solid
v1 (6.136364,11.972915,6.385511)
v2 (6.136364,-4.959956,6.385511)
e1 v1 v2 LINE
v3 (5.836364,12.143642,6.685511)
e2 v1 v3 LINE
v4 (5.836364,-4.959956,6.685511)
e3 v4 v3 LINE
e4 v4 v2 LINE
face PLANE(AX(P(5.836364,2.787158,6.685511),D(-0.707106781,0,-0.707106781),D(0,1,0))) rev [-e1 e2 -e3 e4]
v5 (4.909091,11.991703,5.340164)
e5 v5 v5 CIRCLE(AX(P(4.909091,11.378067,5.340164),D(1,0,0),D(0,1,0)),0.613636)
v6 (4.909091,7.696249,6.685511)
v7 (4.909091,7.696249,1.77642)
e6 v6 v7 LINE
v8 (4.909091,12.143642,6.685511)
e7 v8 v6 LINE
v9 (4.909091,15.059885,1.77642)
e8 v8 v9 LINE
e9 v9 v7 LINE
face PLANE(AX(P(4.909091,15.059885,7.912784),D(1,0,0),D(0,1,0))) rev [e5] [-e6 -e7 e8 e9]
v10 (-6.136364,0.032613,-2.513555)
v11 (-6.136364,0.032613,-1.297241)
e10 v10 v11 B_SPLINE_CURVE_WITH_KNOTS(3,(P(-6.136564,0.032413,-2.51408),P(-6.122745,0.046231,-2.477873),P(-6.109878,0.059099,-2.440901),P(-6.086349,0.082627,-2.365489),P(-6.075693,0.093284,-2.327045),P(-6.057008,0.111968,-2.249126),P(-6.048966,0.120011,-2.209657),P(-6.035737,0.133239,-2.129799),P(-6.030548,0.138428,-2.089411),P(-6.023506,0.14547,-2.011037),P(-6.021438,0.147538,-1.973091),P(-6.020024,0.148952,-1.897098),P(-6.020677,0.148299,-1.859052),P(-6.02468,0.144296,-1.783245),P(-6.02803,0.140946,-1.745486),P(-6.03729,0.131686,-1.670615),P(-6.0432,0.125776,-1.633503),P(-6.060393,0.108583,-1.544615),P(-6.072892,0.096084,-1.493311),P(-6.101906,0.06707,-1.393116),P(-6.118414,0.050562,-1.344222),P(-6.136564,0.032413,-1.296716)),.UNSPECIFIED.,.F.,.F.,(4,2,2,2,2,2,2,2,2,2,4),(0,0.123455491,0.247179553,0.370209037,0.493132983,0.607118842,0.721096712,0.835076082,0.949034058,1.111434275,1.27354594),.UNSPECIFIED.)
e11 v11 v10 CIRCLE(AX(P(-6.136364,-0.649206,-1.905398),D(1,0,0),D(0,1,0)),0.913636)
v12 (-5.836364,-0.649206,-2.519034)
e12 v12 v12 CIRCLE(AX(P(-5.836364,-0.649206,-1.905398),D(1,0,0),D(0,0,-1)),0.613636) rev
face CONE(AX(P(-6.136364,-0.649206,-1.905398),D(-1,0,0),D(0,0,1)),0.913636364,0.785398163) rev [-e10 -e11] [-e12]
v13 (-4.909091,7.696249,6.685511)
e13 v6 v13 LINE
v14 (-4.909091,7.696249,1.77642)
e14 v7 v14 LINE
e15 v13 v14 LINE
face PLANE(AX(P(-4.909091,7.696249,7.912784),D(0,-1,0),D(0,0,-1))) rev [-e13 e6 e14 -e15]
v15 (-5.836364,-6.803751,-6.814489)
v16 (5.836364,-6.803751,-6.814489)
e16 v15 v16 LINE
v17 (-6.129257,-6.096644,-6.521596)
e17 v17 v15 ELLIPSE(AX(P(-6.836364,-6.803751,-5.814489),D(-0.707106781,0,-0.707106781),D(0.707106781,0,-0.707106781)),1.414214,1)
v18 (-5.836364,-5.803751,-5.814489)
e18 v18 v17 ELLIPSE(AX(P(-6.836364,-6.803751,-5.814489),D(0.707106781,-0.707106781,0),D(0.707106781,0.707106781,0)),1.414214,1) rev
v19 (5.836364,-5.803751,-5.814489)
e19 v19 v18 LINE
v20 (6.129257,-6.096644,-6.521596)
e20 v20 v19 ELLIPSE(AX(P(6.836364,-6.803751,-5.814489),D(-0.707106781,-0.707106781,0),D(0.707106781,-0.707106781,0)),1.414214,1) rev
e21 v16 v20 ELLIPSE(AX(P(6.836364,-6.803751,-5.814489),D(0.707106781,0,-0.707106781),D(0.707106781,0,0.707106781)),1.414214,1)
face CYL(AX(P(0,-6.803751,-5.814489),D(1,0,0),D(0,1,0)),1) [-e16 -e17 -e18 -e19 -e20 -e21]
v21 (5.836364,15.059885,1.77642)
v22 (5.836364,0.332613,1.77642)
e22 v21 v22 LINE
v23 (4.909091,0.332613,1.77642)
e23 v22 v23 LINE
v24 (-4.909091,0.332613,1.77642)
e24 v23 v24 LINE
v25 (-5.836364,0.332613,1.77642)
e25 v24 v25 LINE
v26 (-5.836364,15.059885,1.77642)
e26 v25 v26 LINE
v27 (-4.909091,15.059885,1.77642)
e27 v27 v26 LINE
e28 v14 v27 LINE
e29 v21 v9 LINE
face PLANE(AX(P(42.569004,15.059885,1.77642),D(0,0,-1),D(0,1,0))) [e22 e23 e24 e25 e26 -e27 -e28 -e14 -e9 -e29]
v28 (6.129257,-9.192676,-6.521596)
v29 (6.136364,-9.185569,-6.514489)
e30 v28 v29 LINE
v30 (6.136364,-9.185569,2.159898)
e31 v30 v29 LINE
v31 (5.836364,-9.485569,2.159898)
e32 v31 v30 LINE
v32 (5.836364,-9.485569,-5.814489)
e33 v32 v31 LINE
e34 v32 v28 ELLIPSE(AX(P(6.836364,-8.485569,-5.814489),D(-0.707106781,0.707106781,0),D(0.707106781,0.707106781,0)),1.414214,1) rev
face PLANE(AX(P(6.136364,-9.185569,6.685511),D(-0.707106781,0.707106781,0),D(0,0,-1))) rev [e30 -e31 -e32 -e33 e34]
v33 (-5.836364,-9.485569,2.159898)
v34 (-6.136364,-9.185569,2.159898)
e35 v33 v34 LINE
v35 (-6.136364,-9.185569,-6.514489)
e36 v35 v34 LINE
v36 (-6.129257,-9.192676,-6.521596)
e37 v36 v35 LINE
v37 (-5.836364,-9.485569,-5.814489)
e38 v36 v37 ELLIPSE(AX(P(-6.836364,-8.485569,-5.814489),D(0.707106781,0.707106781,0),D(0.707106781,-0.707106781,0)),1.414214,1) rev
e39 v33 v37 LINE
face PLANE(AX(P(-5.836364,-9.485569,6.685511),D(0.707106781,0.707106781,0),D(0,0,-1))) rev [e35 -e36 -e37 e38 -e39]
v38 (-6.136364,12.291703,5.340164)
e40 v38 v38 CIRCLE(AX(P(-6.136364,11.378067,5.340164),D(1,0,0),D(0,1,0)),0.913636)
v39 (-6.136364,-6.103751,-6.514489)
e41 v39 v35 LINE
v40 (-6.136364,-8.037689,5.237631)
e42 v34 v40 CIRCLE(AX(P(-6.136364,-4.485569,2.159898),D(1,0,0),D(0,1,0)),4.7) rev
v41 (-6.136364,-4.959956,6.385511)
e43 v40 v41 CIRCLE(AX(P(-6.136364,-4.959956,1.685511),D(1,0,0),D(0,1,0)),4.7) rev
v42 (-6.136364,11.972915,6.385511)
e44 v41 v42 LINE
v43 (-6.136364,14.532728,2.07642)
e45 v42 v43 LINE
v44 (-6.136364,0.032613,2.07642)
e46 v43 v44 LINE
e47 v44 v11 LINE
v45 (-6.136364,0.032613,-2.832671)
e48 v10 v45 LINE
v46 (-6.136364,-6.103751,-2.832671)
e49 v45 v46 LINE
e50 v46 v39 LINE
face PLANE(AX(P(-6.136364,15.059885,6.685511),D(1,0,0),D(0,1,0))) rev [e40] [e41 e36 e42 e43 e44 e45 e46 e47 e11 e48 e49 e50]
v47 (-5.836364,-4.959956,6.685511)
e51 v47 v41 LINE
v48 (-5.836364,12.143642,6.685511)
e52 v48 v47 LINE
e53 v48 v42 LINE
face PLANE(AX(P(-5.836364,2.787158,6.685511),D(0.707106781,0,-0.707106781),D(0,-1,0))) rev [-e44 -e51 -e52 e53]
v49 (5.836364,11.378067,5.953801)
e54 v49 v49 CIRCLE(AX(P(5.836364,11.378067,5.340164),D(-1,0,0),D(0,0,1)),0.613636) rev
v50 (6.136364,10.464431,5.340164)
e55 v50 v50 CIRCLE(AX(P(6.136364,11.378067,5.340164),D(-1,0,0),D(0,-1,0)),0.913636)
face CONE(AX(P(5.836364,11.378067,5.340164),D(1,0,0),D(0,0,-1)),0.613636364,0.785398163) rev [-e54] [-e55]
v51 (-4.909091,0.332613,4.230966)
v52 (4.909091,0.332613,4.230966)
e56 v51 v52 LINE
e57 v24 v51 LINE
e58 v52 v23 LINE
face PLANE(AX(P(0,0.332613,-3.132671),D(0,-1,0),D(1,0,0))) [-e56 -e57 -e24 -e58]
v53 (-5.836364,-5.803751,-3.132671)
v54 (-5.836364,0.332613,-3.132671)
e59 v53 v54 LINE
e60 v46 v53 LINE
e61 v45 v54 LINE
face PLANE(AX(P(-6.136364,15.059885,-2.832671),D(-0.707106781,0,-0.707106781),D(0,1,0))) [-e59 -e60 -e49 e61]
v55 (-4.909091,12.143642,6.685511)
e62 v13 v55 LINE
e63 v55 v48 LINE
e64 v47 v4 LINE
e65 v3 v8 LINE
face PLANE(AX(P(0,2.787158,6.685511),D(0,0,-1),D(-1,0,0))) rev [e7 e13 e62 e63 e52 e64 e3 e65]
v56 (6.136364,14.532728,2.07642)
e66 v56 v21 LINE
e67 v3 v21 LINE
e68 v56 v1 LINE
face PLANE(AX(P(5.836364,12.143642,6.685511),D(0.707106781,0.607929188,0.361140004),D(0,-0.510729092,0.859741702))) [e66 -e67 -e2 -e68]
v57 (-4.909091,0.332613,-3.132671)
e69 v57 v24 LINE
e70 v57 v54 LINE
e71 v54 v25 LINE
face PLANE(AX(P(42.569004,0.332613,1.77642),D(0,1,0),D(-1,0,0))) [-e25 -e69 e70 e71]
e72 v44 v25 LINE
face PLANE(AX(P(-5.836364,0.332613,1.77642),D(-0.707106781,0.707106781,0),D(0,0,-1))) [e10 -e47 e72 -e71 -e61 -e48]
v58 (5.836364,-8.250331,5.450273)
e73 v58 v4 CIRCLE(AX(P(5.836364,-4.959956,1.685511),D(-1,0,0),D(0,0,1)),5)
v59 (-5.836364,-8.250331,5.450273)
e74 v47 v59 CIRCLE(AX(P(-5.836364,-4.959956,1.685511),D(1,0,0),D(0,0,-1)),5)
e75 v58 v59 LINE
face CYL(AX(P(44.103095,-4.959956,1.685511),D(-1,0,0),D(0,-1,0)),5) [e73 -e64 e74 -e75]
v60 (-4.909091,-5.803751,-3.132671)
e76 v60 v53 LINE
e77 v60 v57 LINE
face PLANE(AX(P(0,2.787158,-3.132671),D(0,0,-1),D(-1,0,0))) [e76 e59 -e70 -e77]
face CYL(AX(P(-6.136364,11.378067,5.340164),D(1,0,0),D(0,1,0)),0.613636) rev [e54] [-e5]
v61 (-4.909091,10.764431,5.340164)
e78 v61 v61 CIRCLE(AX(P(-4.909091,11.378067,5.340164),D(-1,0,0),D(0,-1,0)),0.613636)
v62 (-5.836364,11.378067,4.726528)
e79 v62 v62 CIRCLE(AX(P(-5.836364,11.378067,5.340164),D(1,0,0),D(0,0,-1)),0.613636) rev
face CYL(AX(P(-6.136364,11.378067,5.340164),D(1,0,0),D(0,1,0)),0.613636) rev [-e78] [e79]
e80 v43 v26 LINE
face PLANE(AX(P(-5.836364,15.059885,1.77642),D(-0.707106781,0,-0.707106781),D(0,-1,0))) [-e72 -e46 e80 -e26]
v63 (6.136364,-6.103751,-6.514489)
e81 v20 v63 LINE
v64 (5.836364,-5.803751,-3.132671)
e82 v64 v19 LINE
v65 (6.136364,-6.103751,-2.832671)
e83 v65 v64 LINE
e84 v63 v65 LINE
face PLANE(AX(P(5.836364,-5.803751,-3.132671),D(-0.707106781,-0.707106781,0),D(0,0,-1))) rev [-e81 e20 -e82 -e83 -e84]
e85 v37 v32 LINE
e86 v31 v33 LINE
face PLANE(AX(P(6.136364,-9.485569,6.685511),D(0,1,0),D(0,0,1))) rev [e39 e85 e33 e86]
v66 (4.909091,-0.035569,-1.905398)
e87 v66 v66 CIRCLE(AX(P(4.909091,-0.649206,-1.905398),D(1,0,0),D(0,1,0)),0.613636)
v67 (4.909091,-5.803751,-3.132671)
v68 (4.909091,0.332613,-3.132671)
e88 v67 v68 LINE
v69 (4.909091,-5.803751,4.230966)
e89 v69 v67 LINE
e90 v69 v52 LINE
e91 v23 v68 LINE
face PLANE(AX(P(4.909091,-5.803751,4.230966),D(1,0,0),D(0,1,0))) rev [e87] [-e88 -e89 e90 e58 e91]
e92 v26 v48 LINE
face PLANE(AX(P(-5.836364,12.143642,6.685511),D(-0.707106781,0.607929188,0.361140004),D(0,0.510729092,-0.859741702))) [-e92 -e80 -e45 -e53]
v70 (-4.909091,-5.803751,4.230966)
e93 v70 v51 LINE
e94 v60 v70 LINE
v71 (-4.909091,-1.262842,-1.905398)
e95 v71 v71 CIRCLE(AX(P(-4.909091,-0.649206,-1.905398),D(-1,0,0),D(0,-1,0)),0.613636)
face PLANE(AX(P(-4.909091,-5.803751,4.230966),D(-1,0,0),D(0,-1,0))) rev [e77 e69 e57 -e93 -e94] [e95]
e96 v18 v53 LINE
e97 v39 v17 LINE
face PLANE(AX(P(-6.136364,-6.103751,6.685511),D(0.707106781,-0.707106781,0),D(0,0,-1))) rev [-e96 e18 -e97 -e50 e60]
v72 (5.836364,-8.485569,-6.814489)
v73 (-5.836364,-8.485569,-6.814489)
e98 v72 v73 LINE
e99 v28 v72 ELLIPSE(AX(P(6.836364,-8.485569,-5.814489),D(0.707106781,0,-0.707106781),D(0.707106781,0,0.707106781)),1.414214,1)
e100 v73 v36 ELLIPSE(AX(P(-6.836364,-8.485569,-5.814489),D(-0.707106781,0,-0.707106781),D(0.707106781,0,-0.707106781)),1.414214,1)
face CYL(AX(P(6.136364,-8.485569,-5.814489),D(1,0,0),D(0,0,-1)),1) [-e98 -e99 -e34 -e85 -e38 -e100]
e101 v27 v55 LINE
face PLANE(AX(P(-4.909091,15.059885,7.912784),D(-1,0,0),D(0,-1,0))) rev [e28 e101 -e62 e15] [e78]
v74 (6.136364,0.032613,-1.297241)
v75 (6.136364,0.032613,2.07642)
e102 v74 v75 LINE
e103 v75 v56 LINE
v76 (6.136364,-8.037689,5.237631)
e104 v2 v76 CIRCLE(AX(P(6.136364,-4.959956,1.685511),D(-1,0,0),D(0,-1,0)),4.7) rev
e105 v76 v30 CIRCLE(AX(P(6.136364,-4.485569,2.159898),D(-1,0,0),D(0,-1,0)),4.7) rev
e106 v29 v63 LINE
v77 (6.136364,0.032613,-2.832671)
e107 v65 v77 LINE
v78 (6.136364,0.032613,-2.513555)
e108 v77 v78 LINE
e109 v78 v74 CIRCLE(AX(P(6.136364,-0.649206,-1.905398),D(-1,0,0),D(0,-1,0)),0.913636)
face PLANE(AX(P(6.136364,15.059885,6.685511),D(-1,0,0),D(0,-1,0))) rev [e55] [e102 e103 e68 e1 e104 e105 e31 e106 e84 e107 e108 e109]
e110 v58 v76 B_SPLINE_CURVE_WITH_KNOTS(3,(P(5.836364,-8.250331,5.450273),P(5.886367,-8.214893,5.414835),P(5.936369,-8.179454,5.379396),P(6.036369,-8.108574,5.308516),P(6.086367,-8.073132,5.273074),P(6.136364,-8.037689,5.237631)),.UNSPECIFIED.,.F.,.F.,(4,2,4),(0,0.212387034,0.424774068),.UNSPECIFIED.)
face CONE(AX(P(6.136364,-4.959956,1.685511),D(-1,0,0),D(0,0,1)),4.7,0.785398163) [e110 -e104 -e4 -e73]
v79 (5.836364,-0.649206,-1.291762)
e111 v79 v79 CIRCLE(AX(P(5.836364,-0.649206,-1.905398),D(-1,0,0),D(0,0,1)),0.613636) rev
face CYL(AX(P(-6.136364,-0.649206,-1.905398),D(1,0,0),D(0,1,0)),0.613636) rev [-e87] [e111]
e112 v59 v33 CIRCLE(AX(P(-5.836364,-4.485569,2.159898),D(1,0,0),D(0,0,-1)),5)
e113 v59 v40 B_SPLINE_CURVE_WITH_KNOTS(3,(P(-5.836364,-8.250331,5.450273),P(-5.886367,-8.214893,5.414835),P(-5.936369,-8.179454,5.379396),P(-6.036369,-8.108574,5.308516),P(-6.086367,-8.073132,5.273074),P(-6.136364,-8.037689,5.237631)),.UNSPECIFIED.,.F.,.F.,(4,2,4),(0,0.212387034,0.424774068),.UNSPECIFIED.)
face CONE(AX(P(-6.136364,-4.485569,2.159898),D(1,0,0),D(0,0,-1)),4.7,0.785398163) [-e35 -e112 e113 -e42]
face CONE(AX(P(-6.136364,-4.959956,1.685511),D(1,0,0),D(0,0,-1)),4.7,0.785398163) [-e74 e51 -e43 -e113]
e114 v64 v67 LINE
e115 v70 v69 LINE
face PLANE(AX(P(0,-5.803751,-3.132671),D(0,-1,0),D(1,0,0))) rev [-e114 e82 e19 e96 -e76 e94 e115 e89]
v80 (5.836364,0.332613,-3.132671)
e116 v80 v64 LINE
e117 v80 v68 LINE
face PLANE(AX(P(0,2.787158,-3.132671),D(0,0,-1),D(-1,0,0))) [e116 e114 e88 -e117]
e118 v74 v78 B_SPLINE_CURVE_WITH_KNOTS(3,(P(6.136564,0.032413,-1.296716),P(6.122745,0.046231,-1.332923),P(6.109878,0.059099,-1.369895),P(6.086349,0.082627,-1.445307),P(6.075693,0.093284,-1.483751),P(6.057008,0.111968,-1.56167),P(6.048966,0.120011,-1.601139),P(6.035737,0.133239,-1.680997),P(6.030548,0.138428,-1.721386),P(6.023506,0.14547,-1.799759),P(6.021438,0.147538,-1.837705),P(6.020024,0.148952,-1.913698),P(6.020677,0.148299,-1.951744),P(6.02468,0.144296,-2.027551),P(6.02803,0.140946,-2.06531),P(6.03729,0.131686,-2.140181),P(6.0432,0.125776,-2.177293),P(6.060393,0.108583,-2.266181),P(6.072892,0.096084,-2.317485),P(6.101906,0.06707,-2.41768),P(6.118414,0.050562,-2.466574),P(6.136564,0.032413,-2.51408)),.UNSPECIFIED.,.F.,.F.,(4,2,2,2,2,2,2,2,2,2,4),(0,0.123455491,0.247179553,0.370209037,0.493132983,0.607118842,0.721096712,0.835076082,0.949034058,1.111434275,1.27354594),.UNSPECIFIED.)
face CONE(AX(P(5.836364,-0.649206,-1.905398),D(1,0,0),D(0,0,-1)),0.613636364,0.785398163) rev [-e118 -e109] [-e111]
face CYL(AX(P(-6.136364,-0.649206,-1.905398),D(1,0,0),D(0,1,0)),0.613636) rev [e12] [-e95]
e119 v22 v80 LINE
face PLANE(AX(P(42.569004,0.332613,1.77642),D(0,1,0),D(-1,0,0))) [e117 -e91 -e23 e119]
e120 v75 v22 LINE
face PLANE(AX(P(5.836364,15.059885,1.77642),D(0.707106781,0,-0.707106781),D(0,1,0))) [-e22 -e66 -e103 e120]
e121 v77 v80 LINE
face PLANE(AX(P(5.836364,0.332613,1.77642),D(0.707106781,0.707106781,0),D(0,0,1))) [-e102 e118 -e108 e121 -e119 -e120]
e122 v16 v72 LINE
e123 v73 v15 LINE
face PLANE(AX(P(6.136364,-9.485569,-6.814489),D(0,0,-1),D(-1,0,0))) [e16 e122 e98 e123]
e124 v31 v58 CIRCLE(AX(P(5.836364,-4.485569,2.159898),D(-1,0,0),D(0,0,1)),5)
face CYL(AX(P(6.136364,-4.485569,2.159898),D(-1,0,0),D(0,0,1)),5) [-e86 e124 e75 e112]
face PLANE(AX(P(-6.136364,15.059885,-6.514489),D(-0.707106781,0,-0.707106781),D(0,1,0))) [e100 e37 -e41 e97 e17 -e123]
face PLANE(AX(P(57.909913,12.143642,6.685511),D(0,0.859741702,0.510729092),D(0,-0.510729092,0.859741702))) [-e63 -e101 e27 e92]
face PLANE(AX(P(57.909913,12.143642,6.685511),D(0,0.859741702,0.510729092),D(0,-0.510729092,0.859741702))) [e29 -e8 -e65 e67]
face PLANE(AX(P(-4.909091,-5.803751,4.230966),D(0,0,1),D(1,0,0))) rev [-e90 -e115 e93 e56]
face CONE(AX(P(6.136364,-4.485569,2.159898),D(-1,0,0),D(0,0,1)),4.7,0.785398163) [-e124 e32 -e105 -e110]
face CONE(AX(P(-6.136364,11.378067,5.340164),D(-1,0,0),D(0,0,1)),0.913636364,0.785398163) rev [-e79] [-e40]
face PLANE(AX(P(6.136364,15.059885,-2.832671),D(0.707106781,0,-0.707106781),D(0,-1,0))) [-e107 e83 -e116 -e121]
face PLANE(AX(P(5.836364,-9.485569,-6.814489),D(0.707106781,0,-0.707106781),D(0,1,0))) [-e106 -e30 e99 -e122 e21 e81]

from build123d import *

# Parameters (mm, degrees)
SKETCH_1_W                = 5
SKETCH_1_H                = 10
EXTRUDE_1_DEPTH           = 4
CUT_EXTRUDE_1_DEPTH       = 9.124038405
CUT_EXTRUDE_1_DEPTH_BACK  = 9.124038405
CUT_EXTRUDE_2_DEPTH       = 9.124038405
CUT_EXTRUDE_2_DEPTH_BACK  = 9.124038405
SKETCH_6_W                = 4
SKETCH_6_H                = 3
CUT_EXTRUDE_3_DEPTH       = 2.5
SKETCH_7_W                = 4
SKETCH_7_H                = 3
CUT_EXTRUDE_4_DEPTH       = 2.5
CUT_EXTRUDE_5_DEPTH       = 9.124038405
CUT_EXTRUDE_5_DEPTH_BACK  = 9.124038405
CUT_EXTRUDE_10_DEPTH      = 9.124038405
CUT_EXTRUDE_10_DEPTH_BACK = 5
SKETCH_11_R               = 0.25
CUT_EXTRUDE_11_DEPTH      = 5
SKETCH_12_R               = 0.25
CUT_EXTRUDE_12_DEPTH      = 5
EXTRUDE_3_DEPTH           = 5
SCALE_1_SCALE             = 2.454545455
FILLET_1_R                = 5
CHAMFER_1_SIZE            = 0.3
FILLET_2_R                = 1


with BuildPart() as part:
    # 草图1 → 凸台-拉伸1 (new body)
    with BuildSketch(Plane.XY):
        Rectangle(SKETCH_1_W, SKETCH_1_H)
    extrude(amount=EXTRUDE_1_DEPTH)

    # 草图2 → 切除-拉伸1 (cut, two sides: drawn at the far end of the back side and taken through both)
    with BuildSketch(Plane(origin=(2.5, 0, 0), x_dir=(0, 0, -1), z_dir=(1, 0, 0)).offset(-CUT_EXTRUDE_1_DEPTH_BACK)):
        Polygon((-30.132775887, -11.712260262), (-4, 3.811901084), (-2, 5), (24.132775887, 20.524161347), (-6.915546806, 72.789713121), (-61.181098581, 40.553291512), align=None)
    extrude(amount=CUT_EXTRUDE_1_DEPTH + CUT_EXTRUDE_1_DEPTH_BACK, mode=Mode.SUBTRACT)

    # 草图3 → 切除-拉伸2 (cut, two sides: drawn at the far end of the back side and taken through both)
    with BuildSketch(Plane(origin=(2.5, 0, 0), x_dir=(0, 0, -1), z_dir=(1, 0, 0)).offset(-CUT_EXTRUDE_2_DEPTH_BACK)):
        Polygon((-2, 35.396078054), (-2, 5), (-2, -1), (0, -1), (30.396078054, -1), (75.805427436, 39.418773275), (43.409349382, 75.814851329), align=None)
    extrude(amount=CUT_EXTRUDE_2_DEPTH + CUT_EXTRUDE_2_DEPTH_BACK, mode=Mode.SUBTRACT)

    # 草图6 → 切除-拉伸3 (cut)
    with BuildSketch(Plane(origin=(0, -1, 0), x_dir=(1, 0, 0), z_dir=(0, 1, 0))):
        with Locations((0, -1.5)):
            Rectangle(SKETCH_6_W, SKETCH_6_H)
    extrude(amount=-CUT_EXTRUDE_3_DEPTH, mode=Mode.SUBTRACT)

    # 草图7 → 切除-拉伸4 (cut)
    with BuildSketch(Plane(origin=(0, 0, 2), x_dir=(-1, 0, 0), z_dir=(0, 0, -1))):
        with Locations((0, 3.5)):
            Rectangle(SKETCH_7_W, SKETCH_7_H)
    extrude(amount=-CUT_EXTRUDE_4_DEPTH, mode=Mode.SUBTRACT)

    # 草图8 → 切除-拉伸5 (cut, two sides: drawn at the far end of the back side and taken through both)
    with BuildSketch(Plane(origin=(2.5, 0, 0), x_dir=(0, 0, -1), z_dir=(1, 0, 0)).offset(-CUT_EXTRUDE_5_DEPTH_BACK)):
        Polygon((-25.835890872, 17.835890872), (-4, -4), (-3, -5), (18.835890872, -26.835890872), (-24.835890872, -70.507672616), (-69.507672616, -25.835890872), align=None)
    extrude(amount=CUT_EXTRUDE_5_DEPTH + CUT_EXTRUDE_5_DEPTH_BACK, mode=Mode.SUBTRACT)

    # 草图9 → 切除-拉伸10 (cut, two sides: drawn at the far end of the back side and taken through both)
    with BuildSketch(Plane(origin=(2.5, 0, 0), x_dir=(0, 0, -1), z_dir=(1, 0, 0)).offset(-CUT_EXTRUDE_10_DEPTH_BACK)):
        Polygon((-23.148447549, -26.648447549), (-1.5, -5), (0, -3.5), (21.648447549, 18.148447549), (64.945342647, -25.148447549), (20.148447549, -69.945342647), align=None)
    extrude(amount=CUT_EXTRUDE_10_DEPTH + CUT_EXTRUDE_10_DEPTH_BACK, mode=Mode.SUBTRACT)

    # 草图11 → 切除-拉伸11 (cut)
    with BuildSketch(Plane(origin=(2.5, 0, 0), x_dir=(0, 0, -1), z_dir=(1, 0, 0))):
        with Locations(Location((-3.451895846, 3.5, 0), (0, 0, 90))):
            Circle(SKETCH_11_R)
    extrude(amount=-CUT_EXTRUDE_11_DEPTH, mode=Mode.SUBTRACT)

    # 草图12 → 切除-拉伸12 (cut)
    with BuildSketch(Plane(origin=(2.5, 0, 0), x_dir=(0, 0, -1), z_dir=(1, 0, 0))):
        with Locations(Location((-0.5, -1.4, 0), (0, 0, 90))):
            Circle(SKETCH_12_R)
    extrude(amount=-CUT_EXTRUDE_12_DEPTH, mode=Mode.SUBTRACT)

    # 草图14 → 凸台-拉伸3 (add)
    with BuildSketch(Plane.ZY.offset(2.5)):
        Polygon((1.5, -5), (-1.5, -5), (-1.5, -3.5), (0, -3.5), align=None)
    extrude(amount=-EXTRUDE_3_DEPTH)


with BuildPart() as part_1:
    # 缩放比例1: scaled about (0, -1.916171136, 2.153711166)
    add(part.part.scale(SCALE_1_SCALE).moved(Location((0, 2.787158016, -3.132670787))))

    # 圆角1
    # the kernel refuses this fillet: 5 mm, written as the material it takes off along each edge
    with BuildSketch(Plane(origin=(11.314033166, -9.485569257, 4.230965577), x_dir=(0, 0.7071067811865475, 0.7071067811865475), z_dir=(-1, 0, 0))) as fillet_1_piece_1:
        with BuildLine():
            CenterArc((FILLET_1_R * 0.414213562373, FILLET_1_R), FILLET_1_R, 225, 45)
            Line((-FILLET_1_R * 0.292893218813, FILLET_1_R * 0.292893218813), (0, 0))
            Line((0, 0), (FILLET_1_R * 0.414213562373, 0))
        make_face()
    extrude(amount=22.628066332, mode=Mode.SUBTRACT)
    with BuildSketch(Plane(origin=(11.314033166, -7.031023802, 6.685511031), x_dir=(0, -0.7071067811865476, -0.7071067811865476), z_dir=(-1, 0, 0))) as fillet_1_piece_2:
        with BuildLine():
            CenterArc((FILLET_1_R * 0.414213562373, -FILLET_1_R), FILLET_1_R, 90, 45)
            Line((-FILLET_1_R * 0.292893218813, -FILLET_1_R * 0.292893218813), (0, 0))
            Line((0, 0), (FILLET_1_R * 0.414213562373, 0))
        make_face()
    extrude(amount=22.628066332, mode=Mode.SUBTRACT)

    # 倒角1
    # the kernel refuses this chamfer: 0.3 mm, written as the material it takes off along each edge
    with BuildSketch(Plane(origin=(6.136363636, -4.95995599, 6.685511031), x_dir=(-0.9996219169112968, 0, 0.027495876610587344), z_dir=(0, 1, 0)), Plane(origin=(-6.136363636, 12.915147392, 6.685511031), x_dir=(0.9996219169112968, 0, 0.027495876610587344), z_dir=(0, -1, 0))) as chamfer_1_piece_1:
        Polygon((CHAMFER_1_SIZE * 0.999621916911, -CHAMFER_1_SIZE * 0.0274958766106), (-CHAMFER_1_SIZE * 0.0274958766106, -CHAMFER_1_SIZE * 0.999621916911), (0, 0), align=None)
    extrude(amount=17.875103383, mode=Mode.SUBTRACT)
    with BuildSketch(Plane(origin=(6.136363636, 15.831390185, 1.776420122), x_dir=(-0.9996219169112968, 0, -0.027495876610586622), z_dir=(0, -1, 0)), Plane(origin=(-6.136363636, 0.332612561, 1.776420122), x_dir=(0.9996219169112965, 0, -0.027495876610589495), z_dir=(0, 1, 0))) as chamfer_1_piece_2:
        Polygon((CHAMFER_1_SIZE * 0.999621916911, -CHAMFER_1_SIZE * 0.0274958766106), (-CHAMFER_1_SIZE * 0.0274958766106, -CHAMFER_1_SIZE * 0.999621916911), (0, 0), align=None)
    extrude(amount=15.498777624, mode=Mode.SUBTRACT)
    with BuildSketch(Plane(origin=(6.136363636, 0.332612561, 1.776420122), x_dir=(0.02749587661059016, -0.9996219169112965, 0), z_dir=(0, 0, -1)), Plane(origin=(-6.136363636, 0.332612561, -3.904175683), x_dir=(-0.027495876610587448, -0.9996219169112968, 0), z_dir=(0, 0, 1))) as chamfer_1_piece_3:
        Polygon((CHAMFER_1_SIZE * 0.999621916911, CHAMFER_1_SIZE * 0.0274958766106), (-CHAMFER_1_SIZE * 0.0274958766106, CHAMFER_1_SIZE * 0.999621916911), (0, 0), align=None)
    extrude(amount=5.680595805, mode=Mode.SUBTRACT)
    with BuildSketch(Plane(origin=(6.136363636, -5.803751075, -3.132670787), x_dir=(0.027495876610587378, 0, 0.9996219169112965), z_dir=(0, 1, 0)), Plane(origin=(-6.136363636, 1.104117458, -3.132670787), x_dir=(-0.027495876610587378, 0, 0.9996219169112965), z_dir=(0, -1, 0))) as chamfer_1_piece_4:
        Polygon((CHAMFER_1_SIZE * 0.999621916911, -CHAMFER_1_SIZE * 0.0274958766106), (-CHAMFER_1_SIZE * 0.0274958766106, -CHAMFER_1_SIZE * 0.999621916911), (0, 0), align=None)
    extrude(amount=6.907868533, mode=Mode.SUBTRACT)
    with BuildSketch(Plane(origin=(-6.136363636, -5.803751075, -7.585993865), x_dir=(-0.027495876610587264, -0.9996219169112968, 0), z_dir=(0, 0, 1))) as chamfer_1_piece_5:
        Polygon((CHAMFER_1_SIZE * 0.999621916911, CHAMFER_1_SIZE * 0.0274958766106), (-CHAMFER_1_SIZE * 0.0274958766106, CHAMFER_1_SIZE * 0.999621916911), (0, 0), align=None)
    extrude(amount=4.453323078, mode=Mode.SUBTRACT)
    with BuildSketch(Plane(origin=(6.136363636, -5.803751075, -7.585993865), x_dir=(0.027495876610587264, -0.9996219169112968, 0), z_dir=(0, 0, 1))) as chamfer_1_piece_6:
        Polygon((CHAMFER_1_SIZE * 0.999621916911, -CHAMFER_1_SIZE * 0.0274958766106), (-CHAMFER_1_SIZE * 0.0274958766106, -CHAMFER_1_SIZE * 0.999621916911), (0, 0), align=None)
    extrude(amount=4.453323078, mode=Mode.SUBTRACT)
    with BuildSketch(Plane(origin=(-6.136363636, -10.257074153, -6.814488969), x_dir=(-0.027495876610587344, 0, 0.9996219169112968), z_dir=(0, 1, 0))) as chamfer_1_piece_7:
        Polygon((CHAMFER_1_SIZE * 0.999621916911, CHAMFER_1_SIZE * 0.0274958766106), (-CHAMFER_1_SIZE * 0.0274958766106, CHAMFER_1_SIZE * 0.999621916911), (0, 0), align=None)
    extrude(amount=5.224827975, mode=Mode.SUBTRACT)
    with BuildSketch(Plane(origin=(6.136363636, -10.257074153, -6.814488969), x_dir=(0.027495876610587344, 0, 0.9996219169112968), z_dir=(0, 1, 0))) as chamfer_1_piece_8:
        Polygon((CHAMFER_1_SIZE * 0.999621916911, -CHAMFER_1_SIZE * 0.0274958766106), (-CHAMFER_1_SIZE * 0.0274958766106, -CHAMFER_1_SIZE * 0.999621916911), (0, 0), align=None)
    extrude(amount=5.224827975, mode=Mode.SUBTRACT)
    with BuildSketch(Plane(origin=(6.136363636, -9.485569257, 2.159897765), x_dir=(0.027495876610587344, 0.9996219169112968, 0), z_dir=(0, 0, -1)), Plane(origin=(-6.136363636, -9.485569257, -7.585993865), x_dir=(-0.027495876610587344, 0.9996219169112968, 0), z_dir=(0, 0, 1))) as chamfer_1_piece_9:
        Polygon((CHAMFER_1_SIZE * 0.999621916911, -CHAMFER_1_SIZE * 0.0274958766106), (-CHAMFER_1_SIZE * 0.0274958766106, -CHAMFER_1_SIZE * 0.999621916911), (0, 0), align=None)
    extrude(amount=9.74589163, mode=Mode.SUBTRACT)
    with BuildSketch(Plane(origin=(6.136363636, -4.485569257, 2.159897765), x_dir=(0, -0.642857600187849, 0.765985708666108), z_dir=(0, 0.765985708666108, 0.642857600187849))) as chamfer_1_piece_10:
        Polygon((5 - CHAMFER_1_SIZE, 0), (5, -CHAMFER_1_SIZE), (5, 0), align=None)
    revolve(axis=Axis((6.136363636, -4.485569257, 2.159897765), (1, 0, 0)), revolution_arc=49.994764907, mode=Mode.SUBTRACT)
    with BuildSketch(Plane(origin=(6.136363636, -4.95995599, 1.685511031), x_dir=(0, 0, 1), z_dir=(0, 1, 0))) as chamfer_1_piece_11:
        Polygon((5 - CHAMFER_1_SIZE, 0), (5, -CHAMFER_1_SIZE), (5, 0), align=None)
    revolve(axis=Axis((6.136363636, -4.95995599, 1.685511031), (1, 0, 0)), revolution_arc=49.994764907, mode=Mode.SUBTRACT)
    with BuildSketch(Plane(origin=(6.136363636, 11.378067107, 5.34016447), x_dir=(0, 1, 0), z_dir=(0, 0, -1))) as chamfer_1_piece_12:
        Polygon((0.613636364 + CHAMFER_1_SIZE, 0), (0.613636364, -CHAMFER_1_SIZE), (0.613636364, 0), align=None)
    revolve(axis=Axis((6.136363636, 11.378067107, 5.34016447), (1, 0, 0)), mode=Mode.SUBTRACT)
    with BuildSketch(Plane(origin=(6.136363636, -0.64920562, -1.90539806), x_dir=(0, 1, 0), z_dir=(0, 0, -1))) as chamfer_1_piece_13:
        Polygon((0.613636364 + CHAMFER_1_SIZE, 0), (0.613636364, -CHAMFER_1_SIZE), (0.613636364, 0), align=None)
    revolve(axis=Axis((6.136363636, -0.64920562, -1.90539806), (1, 0, 0)), mode=Mode.SUBTRACT)
    with BuildSketch(Plane(origin=(-6.136363636, -4.95995599, 1.685511031), x_dir=(0, 0, 1), z_dir=(0, 1, 0))) as chamfer_1_piece_14:
        Polygon((5, CHAMFER_1_SIZE), (5 - CHAMFER_1_SIZE, 0), (5, 0), align=None)
    revolve(axis=Axis((-6.136363636, -4.95995599, 1.685511031), (1, 0, 0)), revolution_arc=49.994764907, mode=Mode.SUBTRACT)
    with BuildSketch(Plane(origin=(-6.136363636, -4.485569257, 2.159897765), x_dir=(0, -0.6428576001878487, 0.7659857086661084), z_dir=(0, 0.7659857086661084, 0.6428576001878487))) as chamfer_1_piece_15:
        Polygon((5 - CHAMFER_1_SIZE, 0), (5, CHAMFER_1_SIZE), (5, 0), align=None)
    revolve(axis=Axis((-6.136363636, -4.485569257, 2.159897765), (1, 0, 0)), revolution_arc=49.994764907, mode=Mode.SUBTRACT)
    with BuildSketch(Plane(origin=(-6.136363636, 11.378067107, 5.34016447), x_dir=(0, 1, 0), z_dir=(0, 0, -1))) as chamfer_1_piece_16:
        Polygon((0.613636364 + CHAMFER_1_SIZE, 0), (0.613636364, CHAMFER_1_SIZE), (0.613636364, 0), align=None)
    revolve(axis=Axis((-6.136363636, 11.378067107, 5.34016447), (1, 0, 0)), mode=Mode.SUBTRACT)
    with BuildSketch(Plane(origin=(-6.136363636, -0.64920562, -1.90539806), x_dir=(0, 1, 0), z_dir=(0, 0, -1))) as chamfer_1_piece_17:
        Polygon((0.613636364 + CHAMFER_1_SIZE, 0), (0.613636364, CHAMFER_1_SIZE), (0.613636364, 0), align=None)
    revolve(axis=Axis((-6.136363636, -0.64920562, -1.90539806), (1, 0, 0)), mode=Mode.SUBTRACT)
    with BuildSketch(Plane(origin=(6.136363636, 11.749612501, 7.348805964), x_dir=(-0.9996219169112968, 0.023639351761111982, 0.014042944096554499), z_dir=(0, 0.5107290920540476, -0.8597417022162227)), Plane(origin=(-6.136363636, 15.453915284, 1.113125189), x_dir=(0.9996219169112968, 0.023639351761111344, 0.014042944096553983), z_dir=(0, -0.5107290920540476, 0.8597417022162227))) as chamfer_1_piece_18:
        Polygon((CHAMFER_1_SIZE * 0.999621916911, -CHAMFER_1_SIZE * 0.0274958766106), (-CHAMFER_1_SIZE * 0.0274958766106, -CHAMFER_1_SIZE * 0.999621916911), (0, 0), align=None)
    extrude(amount=7.252970001, mode=Mode.SUBTRACT)
    with BuildSketch(Plane(origin=(6.136363636, 15.831390185, 1.776420122), x_dir=(-0.9996219169112968, 0, -0.027495876610586622), z_dir=(0, -1, 0))) as chamfer_1_piece_19a_section:
        Polygon((CHAMFER_1_SIZE * 0.999621916911, -CHAMFER_1_SIZE * 0.0274958766106), (-CHAMFER_1_SIZE * 0.0274958766106, -CHAMFER_1_SIZE * 0.999621916911), (0, 0), align=None)
    chamfer_1_piece_19a = extrude(amount=16.27028252, mode=Mode.PRIVATE)
    chamfer_1_piece_19a = split(chamfer_1_piece_19a, bisect_by=Plane(origin=(6.037425548, 0.332612561, 1.87535821), z_dir=(0, -1, 0)), keep=Keep.TOP, mode=Mode.PRIVATE)
    with BuildSketch(Plane(origin=(6.136363636, 0.332612561, 2.547925019), x_dir=(0.027495876610587288, -0.9996219169112968, 0), z_dir=(0, 0, -1))) as chamfer_1_piece_19b_section:
        Polygon((CHAMFER_1_SIZE * 0.999621916911, CHAMFER_1_SIZE * 0.0274958766106), (-CHAMFER_1_SIZE * 0.0274958766106, CHAMFER_1_SIZE * 0.999621916911), (0, 0), align=None)
    chamfer_1_piece_19b = extrude(amount=6.452100702, mode=Mode.PRIVATE)
    chamfer_1_piece_19b = split(chamfer_1_piece_19b, bisect_by=Plane(origin=(6.037425548, 0.233674473, 1.776420122), z_dir=(0, 0, 1)), keep=Keep.TOP, mode=Mode.PRIVATE)
    chamfer_1_piece_19 = chamfer_1_piece_19a & chamfer_1_piece_19b
    add(chamfer_1_piece_19, mode=Mode.SUBTRACT)
    with BuildSketch(Plane(origin=(6.136363636, -6.575255971, -3.132670787), x_dir=(0.027495876610587378, 0, 0.9996219169112965), z_dir=(0, 1, 0))) as chamfer_1_piece_20a_section:
        Polygon((CHAMFER_1_SIZE * 0.999621916911, -CHAMFER_1_SIZE * 0.0274958766106), (-CHAMFER_1_SIZE * 0.0274958766106, -CHAMFER_1_SIZE * 0.999621916911), (0, 0), align=None)
    chamfer_1_piece_20a = extrude(amount=7.679373429, mode=Mode.PRIVATE)
    chamfer_1_piece_20a = split(chamfer_1_piece_20a, bisect_by=Plane(origin=(6.037425548, -5.803751075, -3.033732699), z_dir=(0, -1, 0)), keep=Keep.TOP, mode=Mode.PRIVATE)
    with BuildSketch(Plane(origin=(6.136363636, -5.803751075, -7.585993865), x_dir=(0.027495876610587264, -0.9996219169112968, 0), z_dir=(0, 0, 1))) as chamfer_1_piece_20b_section:
        Polygon((CHAMFER_1_SIZE * 0.999621916911, -CHAMFER_1_SIZE * 0.0274958766106), (-CHAMFER_1_SIZE * 0.0274958766106, -CHAMFER_1_SIZE * 0.999621916911), (0, 0), align=None)
    chamfer_1_piece_20b = extrude(amount=5.224827975, mode=Mode.PRIVATE)
    chamfer_1_piece_20b = split(chamfer_1_piece_20b, bisect_by=Plane(origin=(6.037425548, -5.902689163, -3.132670787), z_dir=(0, 0, 1)), keep=Keep.TOP, mode=Mode.PRIVATE)
    chamfer_1_piece_20 = chamfer_1_piece_20a & chamfer_1_piece_20b
    add(chamfer_1_piece_20, mode=Mode.SUBTRACT)
    with BuildSketch(Plane(origin=(-6.136363636, 1.104117458, -3.132670787), x_dir=(-0.027495876610587378, 0, 0.9996219169112965), z_dir=(0, -1, 0))) as chamfer_1_piece_21a_section:
        Polygon((CHAMFER_1_SIZE * 0.999621916911, -CHAMFER_1_SIZE * 0.0274958766106), (-CHAMFER_1_SIZE * 0.0274958766106, -CHAMFER_1_SIZE * 0.999621916911), (0, 0), align=None)
    chamfer_1_piece_21a = extrude(amount=7.679373429, mode=Mode.PRIVATE)
    chamfer_1_piece_21a = split(chamfer_1_piece_21a, bisect_by=Plane(origin=(-6.037425548, -5.803751075, -3.033732699), z_dir=(0, -1, 0)), keep=Keep.TOP, mode=Mode.PRIVATE)
    with BuildSketch(Plane(origin=(-6.136363636, -5.803751075, -7.585993865), x_dir=(-0.027495876610587264, -0.9996219169112968, 0), z_dir=(0, 0, 1))) as chamfer_1_piece_21b_section:
        Polygon((CHAMFER_1_SIZE * 0.999621916911, CHAMFER_1_SIZE * 0.0274958766106), (-CHAMFER_1_SIZE * 0.0274958766106, CHAMFER_1_SIZE * 0.999621916911), (0, 0), align=None)
    chamfer_1_piece_21b = extrude(amount=5.224827975, mode=Mode.PRIVATE)
    chamfer_1_piece_21b = split(chamfer_1_piece_21b, bisect_by=Plane(origin=(-6.037425548, -5.902689163, -3.132670787), z_dir=(0, 0, 1)), keep=Keep.TOP, mode=Mode.PRIVATE)
    chamfer_1_piece_21 = chamfer_1_piece_21a & chamfer_1_piece_21b
    add(chamfer_1_piece_21, mode=Mode.SUBTRACT)
    with BuildSketch(Plane(origin=(-6.136363636, -0.438892335, 1.776420122), x_dir=(0.9996219169112968, 0, -0.0274958766105867), z_dir=(0, 1, 0))) as chamfer_1_piece_22a_section:
        Polygon((CHAMFER_1_SIZE * 0.999621916911, -CHAMFER_1_SIZE * 0.0274958766106), (-CHAMFER_1_SIZE * 0.0274958766106, -CHAMFER_1_SIZE * 0.999621916911), (0, 0), align=None)
    chamfer_1_piece_22a = extrude(amount=16.27028252, mode=Mode.PRIVATE)
    chamfer_1_piece_22a = split(chamfer_1_piece_22a, bisect_by=Plane(origin=(-6.037425548, 0.332612561, 1.87535821), z_dir=(0, -1, 0)), keep=Keep.TOP, mode=Mode.PRIVATE)
    with BuildSketch(Plane(origin=(-6.136363636, 0.332612561, -3.904175683), x_dir=(-0.027495876610587448, -0.9996219169112968, 0), z_dir=(0, 0, 1))) as chamfer_1_piece_22b_section:
        Polygon((CHAMFER_1_SIZE * 0.999621916911, CHAMFER_1_SIZE * 0.0274958766106), (-CHAMFER_1_SIZE * 0.0274958766106, CHAMFER_1_SIZE * 0.999621916911), (0, 0), align=None)
    chamfer_1_piece_22b = extrude(amount=6.452100702, mode=Mode.PRIVATE)
    chamfer_1_piece_22b = split(chamfer_1_piece_22b, bisect_by=Plane(origin=(-6.037425548, 0.233674473, 1.776420122), z_dir=(0, 0, 1)), keep=Keep.TOP, mode=Mode.PRIVATE)
    chamfer_1_piece_22 = chamfer_1_piece_22a & chamfer_1_piece_22b
    add(chamfer_1_piece_22, mode=Mode.SUBTRACT)

    # 圆角2
    fillet_2_edges = [part_1.edges().sort_by_distance(p)[0] for p in [
        (0, -5.803751075, -6.814488969),
        (0, -9.485569257, -6.814488969),
    ]]
    fillet(fillet_2_edges, radius=FILLET_2_R)


solid = part_1.part
